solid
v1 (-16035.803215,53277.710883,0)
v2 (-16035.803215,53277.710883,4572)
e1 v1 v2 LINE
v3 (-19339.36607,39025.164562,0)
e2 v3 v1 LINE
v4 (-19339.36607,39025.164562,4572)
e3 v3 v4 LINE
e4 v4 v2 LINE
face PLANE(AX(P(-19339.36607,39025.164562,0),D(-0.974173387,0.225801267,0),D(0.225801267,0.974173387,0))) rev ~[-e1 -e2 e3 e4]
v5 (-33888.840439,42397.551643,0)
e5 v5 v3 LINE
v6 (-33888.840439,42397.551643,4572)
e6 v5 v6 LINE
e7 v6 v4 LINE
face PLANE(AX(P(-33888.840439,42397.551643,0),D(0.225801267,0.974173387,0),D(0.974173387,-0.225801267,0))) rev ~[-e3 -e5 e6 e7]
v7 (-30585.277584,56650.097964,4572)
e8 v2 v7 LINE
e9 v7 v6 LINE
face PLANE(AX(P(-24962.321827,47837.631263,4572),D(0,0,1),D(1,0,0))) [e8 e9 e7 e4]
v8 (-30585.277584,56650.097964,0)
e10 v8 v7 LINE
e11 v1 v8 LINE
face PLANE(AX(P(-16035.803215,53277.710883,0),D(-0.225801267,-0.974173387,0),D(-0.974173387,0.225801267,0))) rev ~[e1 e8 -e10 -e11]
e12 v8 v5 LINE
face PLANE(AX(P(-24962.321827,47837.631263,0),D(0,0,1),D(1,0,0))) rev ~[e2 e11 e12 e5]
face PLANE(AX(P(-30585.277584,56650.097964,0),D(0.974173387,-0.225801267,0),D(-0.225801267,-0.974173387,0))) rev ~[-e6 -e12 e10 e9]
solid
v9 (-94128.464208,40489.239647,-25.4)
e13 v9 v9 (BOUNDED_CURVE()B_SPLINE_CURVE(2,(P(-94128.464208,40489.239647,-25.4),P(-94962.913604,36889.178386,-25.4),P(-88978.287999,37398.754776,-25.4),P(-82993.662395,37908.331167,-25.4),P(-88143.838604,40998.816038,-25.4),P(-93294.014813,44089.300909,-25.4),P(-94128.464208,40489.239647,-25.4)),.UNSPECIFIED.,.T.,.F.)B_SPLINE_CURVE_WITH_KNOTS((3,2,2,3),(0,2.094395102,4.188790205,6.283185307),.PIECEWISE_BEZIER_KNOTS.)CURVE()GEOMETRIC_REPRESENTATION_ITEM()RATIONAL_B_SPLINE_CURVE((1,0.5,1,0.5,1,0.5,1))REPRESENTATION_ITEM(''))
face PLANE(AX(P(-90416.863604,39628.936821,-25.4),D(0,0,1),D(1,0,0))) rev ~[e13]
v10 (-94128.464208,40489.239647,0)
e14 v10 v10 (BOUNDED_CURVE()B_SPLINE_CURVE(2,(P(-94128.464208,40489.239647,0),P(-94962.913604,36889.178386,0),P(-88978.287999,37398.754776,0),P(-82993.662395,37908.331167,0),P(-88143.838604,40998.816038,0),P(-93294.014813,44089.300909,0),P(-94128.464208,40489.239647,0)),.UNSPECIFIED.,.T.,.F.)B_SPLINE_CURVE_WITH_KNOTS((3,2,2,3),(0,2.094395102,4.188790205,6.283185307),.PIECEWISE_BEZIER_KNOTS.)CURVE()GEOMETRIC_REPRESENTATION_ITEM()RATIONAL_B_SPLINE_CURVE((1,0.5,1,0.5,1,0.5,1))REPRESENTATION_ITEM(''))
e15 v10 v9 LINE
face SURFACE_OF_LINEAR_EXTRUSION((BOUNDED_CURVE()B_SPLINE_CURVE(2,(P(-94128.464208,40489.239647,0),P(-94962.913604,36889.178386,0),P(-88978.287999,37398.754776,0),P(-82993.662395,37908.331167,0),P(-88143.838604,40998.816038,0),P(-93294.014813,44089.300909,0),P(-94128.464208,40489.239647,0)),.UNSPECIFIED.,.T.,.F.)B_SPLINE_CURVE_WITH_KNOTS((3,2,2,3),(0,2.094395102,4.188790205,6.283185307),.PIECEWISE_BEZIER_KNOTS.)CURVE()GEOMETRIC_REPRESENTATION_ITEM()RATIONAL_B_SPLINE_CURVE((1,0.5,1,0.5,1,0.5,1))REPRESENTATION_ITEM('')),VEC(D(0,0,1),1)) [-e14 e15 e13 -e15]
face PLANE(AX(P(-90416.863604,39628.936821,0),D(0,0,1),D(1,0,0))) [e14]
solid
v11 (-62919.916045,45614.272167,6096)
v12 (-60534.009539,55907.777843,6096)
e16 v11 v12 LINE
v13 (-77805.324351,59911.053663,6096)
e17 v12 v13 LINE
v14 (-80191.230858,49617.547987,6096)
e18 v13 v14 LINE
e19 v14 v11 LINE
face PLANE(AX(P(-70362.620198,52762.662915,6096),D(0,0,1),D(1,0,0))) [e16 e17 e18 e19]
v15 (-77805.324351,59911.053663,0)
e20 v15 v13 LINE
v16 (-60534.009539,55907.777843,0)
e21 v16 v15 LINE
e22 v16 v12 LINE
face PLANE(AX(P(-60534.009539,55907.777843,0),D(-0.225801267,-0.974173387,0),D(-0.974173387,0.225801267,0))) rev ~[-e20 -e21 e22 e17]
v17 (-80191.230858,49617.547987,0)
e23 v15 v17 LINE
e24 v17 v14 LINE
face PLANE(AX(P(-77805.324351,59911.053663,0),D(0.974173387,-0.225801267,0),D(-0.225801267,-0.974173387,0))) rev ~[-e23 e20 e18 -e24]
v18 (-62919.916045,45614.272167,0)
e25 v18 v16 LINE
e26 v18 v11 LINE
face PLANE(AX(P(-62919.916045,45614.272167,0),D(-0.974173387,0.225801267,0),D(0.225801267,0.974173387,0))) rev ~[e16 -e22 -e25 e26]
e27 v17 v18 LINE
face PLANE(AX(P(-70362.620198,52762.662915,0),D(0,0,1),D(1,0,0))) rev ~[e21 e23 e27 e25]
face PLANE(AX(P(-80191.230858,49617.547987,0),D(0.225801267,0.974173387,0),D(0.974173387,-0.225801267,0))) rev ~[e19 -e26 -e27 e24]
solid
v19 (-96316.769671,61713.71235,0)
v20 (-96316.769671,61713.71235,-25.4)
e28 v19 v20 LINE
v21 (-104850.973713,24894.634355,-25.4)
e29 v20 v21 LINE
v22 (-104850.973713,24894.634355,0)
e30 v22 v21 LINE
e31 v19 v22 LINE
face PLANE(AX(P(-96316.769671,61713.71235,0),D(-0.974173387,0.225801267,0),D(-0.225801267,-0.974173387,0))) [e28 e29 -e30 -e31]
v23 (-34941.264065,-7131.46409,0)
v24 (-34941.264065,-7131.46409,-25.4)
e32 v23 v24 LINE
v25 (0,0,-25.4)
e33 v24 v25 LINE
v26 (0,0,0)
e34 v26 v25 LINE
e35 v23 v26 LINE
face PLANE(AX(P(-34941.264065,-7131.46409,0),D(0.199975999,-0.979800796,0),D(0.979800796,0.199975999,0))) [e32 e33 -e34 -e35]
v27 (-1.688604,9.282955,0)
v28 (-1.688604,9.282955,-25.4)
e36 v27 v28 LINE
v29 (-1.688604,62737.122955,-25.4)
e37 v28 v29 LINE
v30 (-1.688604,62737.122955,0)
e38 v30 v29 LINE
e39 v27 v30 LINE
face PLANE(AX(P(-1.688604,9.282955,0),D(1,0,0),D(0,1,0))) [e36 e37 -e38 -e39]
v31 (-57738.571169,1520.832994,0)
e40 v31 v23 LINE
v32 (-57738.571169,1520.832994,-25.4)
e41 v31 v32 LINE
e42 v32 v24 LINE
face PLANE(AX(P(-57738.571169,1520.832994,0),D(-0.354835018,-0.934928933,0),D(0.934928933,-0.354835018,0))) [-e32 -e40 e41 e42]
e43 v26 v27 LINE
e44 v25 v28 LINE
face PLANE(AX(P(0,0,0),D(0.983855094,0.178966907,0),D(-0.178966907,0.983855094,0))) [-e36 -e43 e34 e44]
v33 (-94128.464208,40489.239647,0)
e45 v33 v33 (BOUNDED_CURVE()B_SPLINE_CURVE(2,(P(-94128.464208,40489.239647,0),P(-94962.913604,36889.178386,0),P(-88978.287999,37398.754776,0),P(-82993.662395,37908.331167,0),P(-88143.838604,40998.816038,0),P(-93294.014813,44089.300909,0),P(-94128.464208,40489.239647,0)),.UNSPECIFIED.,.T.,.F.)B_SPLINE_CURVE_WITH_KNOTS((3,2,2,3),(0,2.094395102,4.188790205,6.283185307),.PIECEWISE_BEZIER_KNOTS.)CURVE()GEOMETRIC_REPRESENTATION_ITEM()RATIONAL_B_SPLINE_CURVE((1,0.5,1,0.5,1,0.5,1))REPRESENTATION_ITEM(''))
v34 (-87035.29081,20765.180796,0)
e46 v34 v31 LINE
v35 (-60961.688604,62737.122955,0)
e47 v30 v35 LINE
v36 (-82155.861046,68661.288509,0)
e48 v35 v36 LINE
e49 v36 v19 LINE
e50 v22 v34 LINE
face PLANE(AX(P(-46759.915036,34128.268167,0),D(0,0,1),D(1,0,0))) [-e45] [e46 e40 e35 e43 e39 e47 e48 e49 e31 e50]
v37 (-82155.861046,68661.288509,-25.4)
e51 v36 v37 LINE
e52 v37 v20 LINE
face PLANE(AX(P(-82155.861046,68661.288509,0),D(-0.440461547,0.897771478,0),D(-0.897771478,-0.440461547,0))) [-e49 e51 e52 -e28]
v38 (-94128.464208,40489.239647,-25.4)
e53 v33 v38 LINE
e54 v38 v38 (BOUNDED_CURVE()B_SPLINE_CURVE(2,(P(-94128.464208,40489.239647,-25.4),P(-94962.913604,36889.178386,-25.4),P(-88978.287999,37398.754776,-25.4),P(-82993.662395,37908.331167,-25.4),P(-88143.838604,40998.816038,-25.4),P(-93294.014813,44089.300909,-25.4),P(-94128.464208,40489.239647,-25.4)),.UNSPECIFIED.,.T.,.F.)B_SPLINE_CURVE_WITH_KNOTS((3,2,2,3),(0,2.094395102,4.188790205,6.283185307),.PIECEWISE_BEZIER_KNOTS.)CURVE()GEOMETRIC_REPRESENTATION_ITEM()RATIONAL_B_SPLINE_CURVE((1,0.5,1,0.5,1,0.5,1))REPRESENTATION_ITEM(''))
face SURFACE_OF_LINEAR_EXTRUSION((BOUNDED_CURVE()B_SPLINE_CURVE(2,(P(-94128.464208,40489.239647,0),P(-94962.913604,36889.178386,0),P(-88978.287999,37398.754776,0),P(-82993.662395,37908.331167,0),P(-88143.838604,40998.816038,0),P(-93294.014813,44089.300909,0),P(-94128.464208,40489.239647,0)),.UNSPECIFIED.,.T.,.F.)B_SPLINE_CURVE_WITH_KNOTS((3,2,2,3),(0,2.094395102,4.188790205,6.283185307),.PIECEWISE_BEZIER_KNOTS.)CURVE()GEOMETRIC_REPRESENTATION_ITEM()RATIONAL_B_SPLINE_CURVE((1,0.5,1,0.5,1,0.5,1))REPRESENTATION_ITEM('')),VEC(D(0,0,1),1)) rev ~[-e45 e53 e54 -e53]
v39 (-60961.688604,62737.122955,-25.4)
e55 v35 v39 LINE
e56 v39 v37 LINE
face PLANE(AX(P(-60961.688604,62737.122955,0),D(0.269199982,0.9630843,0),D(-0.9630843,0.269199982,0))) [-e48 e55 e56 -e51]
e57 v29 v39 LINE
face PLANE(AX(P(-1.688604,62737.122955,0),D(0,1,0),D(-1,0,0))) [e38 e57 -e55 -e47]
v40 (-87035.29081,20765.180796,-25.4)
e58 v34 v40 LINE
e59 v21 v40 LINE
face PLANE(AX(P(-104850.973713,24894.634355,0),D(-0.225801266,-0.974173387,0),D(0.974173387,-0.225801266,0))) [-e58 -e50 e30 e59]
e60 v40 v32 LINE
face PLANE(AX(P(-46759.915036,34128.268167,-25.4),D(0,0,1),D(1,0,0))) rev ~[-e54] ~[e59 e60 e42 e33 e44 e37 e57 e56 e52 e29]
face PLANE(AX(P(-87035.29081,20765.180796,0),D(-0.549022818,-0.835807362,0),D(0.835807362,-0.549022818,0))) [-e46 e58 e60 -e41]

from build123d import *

# Parameters (mm, degrees)
F1_DEPTH = 25.4
F2_DEPTH = 6096
F3_DEPTH = 4572
F4_DEPTH = 25.4
F5_DEPTH = 25.4


# Not quite as in the source:
# - a feature names something its author has since deleted; it is built from what else it names


with BuildPart() as f1:
    # F0 (on Top) → F1 (new body)
    with BuildSketch(Plane.XY):
        Polygon((-33112.4640655049, -3647.3720976521), (-1.6886040407, 3110.491777778), (-1.6886040407, 62737.1229546988), (-60961.6886040408, 62737.1229546987), (-82155.8610464841, 68661.2885088993), (-96316.7696711288, 61713.7123499455), (-104438.0283558496, 26676.2026448331), (-86304.1977238219, 22473.00640182), (-56902.1438828347, 3159.4669638971), (-36770.0640655049, -4481.2923027159), (-36770.0640655049, -599.3720976521), (-33112.4640655049, -599.3720976521), align=None)
        with BuildLine():
            add(Edge.make_bspline(
                [(-94128.4642083729, 40489.2396473104), (-94962.9136036562, 36889.1783857883), (-88978.2879994819, 37398.7547763924), (-82993.6623953076, 37908.3311669965), (-88143.8386041986, 40998.8160379144), (-93294.0148130897, 44089.3009088324), (-94128.4642083729, 40489.2396473104)],
                knots=[0, 0, 0, 2.0943951024, 2.0943951024, 4.1887902048, 4.1887902048, 6.2831853072, 6.2831853072, 6.2831853072], degree=2, weights=[1, 0.5, 1, 0.5, 1, 0.5, 1]))
        make_face(mode=Mode.SUBTRACT)
        Polygon((-80191.2308576593, 49617.5479871827), (-77805.3243514137, 59911.0536632609), (-60534.0095391478, 55907.7778426853), (-62919.9160453934, 45614.272166607), align=None, mode=Mode.SUBTRACT)
        Polygon((-33888.8404387287, 42397.5516428327), (-30585.277583927, 56650.0979635563), (-16035.8032148549, 53277.7108826129), (-19339.3660696566, 39025.1645618892), align=None, mode=Mode.SUBTRACT)
        Polygon((-34941.264065505, -7131.4640898385), (0, 0), (-1.6886040407, 9.2829546987), (-1.6886040407, 3110.491777778), (-33112.4640655049, -3647.3720976521), (-33112.4640655049, -599.3720976521), (-36770.0640655049, -599.3720976521), (-36770.0640655049, -4481.2923027159), (-56902.1438828347, 3159.4669638971), (-86304.1977238219, 22473.00640182), (-104438.0283558496, 26676.2026448331), (-104850.9737126999, 24894.6343547425), (-87035.2908096331, 20765.1807955688), (-57738.5711688761, 1520.832994438), align=None)
        Polygon((-16035.8032148549, 53277.7108826129), (-30585.277583927, 56650.0979635563), (-33888.8404387287, 42397.5516428327), (-19339.3660696566, 39025.1645618892), align=None)
        Polygon((-60534.0095391478, 55907.7778426853), (-77805.3243514137, 59911.0536632609), (-80191.2308576593, 49617.5479871827), (-62919.9160453935, 45614.272166607), align=None)
    extrude(amount=-F1_DEPTH)

    # F0 (on Top) → F4 (cut, through all)
    with BuildSketch(Plane.XY):
        with BuildLine():
            add(Edge.make_bspline(
                [(-94128.4642083729, 40489.2396473104), (-94962.9136036562, 36889.1783857883), (-88978.2879994819, 37398.7547763924), (-82993.6623953076, 37908.3311669965), (-88143.8386041986, 40998.8160379144), (-93294.0148130897, 44089.3009088324), (-94128.4642083729, 40489.2396473104)],
                knots=[0, 0, 0, 2.0943951024, 2.0943951024, 4.1887902048, 4.1887902048, 6.2831853072, 6.2831853072, 6.2831853072], degree=2, weights=[1, 0.5, 1, 0.5, 1, 0.5, 1]))
        make_face()
    extrude(amount=-F4_DEPTH, mode=Mode.SUBTRACT)


with BuildPart() as f2:
    # F0 (on Top) → F2 (new body)
    with BuildSketch(Plane.XY):
        Polygon((-60534.0095391478, 55907.7778426853), (-77805.3243514137, 59911.0536632609), (-80191.2308576593, 49617.5479871827), (-62919.9160453935, 45614.272166607), align=None)
    extrude(amount=F2_DEPTH)


with BuildPart() as f3:
    # F0 (on Top) → F3 (new body)
    with BuildSketch(Plane.XY):
        Polygon((-16035.8032148549, 53277.7108826129), (-30585.277583927, 56650.0979635563), (-33888.8404387287, 42397.5516428327), (-19339.3660696566, 39025.1645618892), align=None)
    extrude(amount=F3_DEPTH)


with BuildPart() as f5:
    # F0 (on Top) → F5 (new body, through all)
    with BuildSketch(Plane.XY):
        with BuildLine():
            add(Edge.make_bspline(
                [(-94128.4642083729, 40489.2396473104), (-94962.9136036562, 36889.1783857883), (-88978.2879994819, 37398.7547763924), (-82993.6623953076, 37908.3311669965), (-88143.8386041986, 40998.8160379144), (-93294.0148130897, 44089.3009088324), (-94128.4642083729, 40489.2396473104)],
                knots=[0, 0, 0, 2.0943951024, 2.0943951024, 4.1887902048, 4.1887902048, 6.2831853072, 6.2831853072, 6.2831853072], degree=2, weights=[1, 0.5, 1, 0.5, 1, 0.5, 1]))
        make_face()
    extrude(amount=-F5_DEPTH)


solid = Compound([f1.part, f2.part, f3.part, f5.part])
